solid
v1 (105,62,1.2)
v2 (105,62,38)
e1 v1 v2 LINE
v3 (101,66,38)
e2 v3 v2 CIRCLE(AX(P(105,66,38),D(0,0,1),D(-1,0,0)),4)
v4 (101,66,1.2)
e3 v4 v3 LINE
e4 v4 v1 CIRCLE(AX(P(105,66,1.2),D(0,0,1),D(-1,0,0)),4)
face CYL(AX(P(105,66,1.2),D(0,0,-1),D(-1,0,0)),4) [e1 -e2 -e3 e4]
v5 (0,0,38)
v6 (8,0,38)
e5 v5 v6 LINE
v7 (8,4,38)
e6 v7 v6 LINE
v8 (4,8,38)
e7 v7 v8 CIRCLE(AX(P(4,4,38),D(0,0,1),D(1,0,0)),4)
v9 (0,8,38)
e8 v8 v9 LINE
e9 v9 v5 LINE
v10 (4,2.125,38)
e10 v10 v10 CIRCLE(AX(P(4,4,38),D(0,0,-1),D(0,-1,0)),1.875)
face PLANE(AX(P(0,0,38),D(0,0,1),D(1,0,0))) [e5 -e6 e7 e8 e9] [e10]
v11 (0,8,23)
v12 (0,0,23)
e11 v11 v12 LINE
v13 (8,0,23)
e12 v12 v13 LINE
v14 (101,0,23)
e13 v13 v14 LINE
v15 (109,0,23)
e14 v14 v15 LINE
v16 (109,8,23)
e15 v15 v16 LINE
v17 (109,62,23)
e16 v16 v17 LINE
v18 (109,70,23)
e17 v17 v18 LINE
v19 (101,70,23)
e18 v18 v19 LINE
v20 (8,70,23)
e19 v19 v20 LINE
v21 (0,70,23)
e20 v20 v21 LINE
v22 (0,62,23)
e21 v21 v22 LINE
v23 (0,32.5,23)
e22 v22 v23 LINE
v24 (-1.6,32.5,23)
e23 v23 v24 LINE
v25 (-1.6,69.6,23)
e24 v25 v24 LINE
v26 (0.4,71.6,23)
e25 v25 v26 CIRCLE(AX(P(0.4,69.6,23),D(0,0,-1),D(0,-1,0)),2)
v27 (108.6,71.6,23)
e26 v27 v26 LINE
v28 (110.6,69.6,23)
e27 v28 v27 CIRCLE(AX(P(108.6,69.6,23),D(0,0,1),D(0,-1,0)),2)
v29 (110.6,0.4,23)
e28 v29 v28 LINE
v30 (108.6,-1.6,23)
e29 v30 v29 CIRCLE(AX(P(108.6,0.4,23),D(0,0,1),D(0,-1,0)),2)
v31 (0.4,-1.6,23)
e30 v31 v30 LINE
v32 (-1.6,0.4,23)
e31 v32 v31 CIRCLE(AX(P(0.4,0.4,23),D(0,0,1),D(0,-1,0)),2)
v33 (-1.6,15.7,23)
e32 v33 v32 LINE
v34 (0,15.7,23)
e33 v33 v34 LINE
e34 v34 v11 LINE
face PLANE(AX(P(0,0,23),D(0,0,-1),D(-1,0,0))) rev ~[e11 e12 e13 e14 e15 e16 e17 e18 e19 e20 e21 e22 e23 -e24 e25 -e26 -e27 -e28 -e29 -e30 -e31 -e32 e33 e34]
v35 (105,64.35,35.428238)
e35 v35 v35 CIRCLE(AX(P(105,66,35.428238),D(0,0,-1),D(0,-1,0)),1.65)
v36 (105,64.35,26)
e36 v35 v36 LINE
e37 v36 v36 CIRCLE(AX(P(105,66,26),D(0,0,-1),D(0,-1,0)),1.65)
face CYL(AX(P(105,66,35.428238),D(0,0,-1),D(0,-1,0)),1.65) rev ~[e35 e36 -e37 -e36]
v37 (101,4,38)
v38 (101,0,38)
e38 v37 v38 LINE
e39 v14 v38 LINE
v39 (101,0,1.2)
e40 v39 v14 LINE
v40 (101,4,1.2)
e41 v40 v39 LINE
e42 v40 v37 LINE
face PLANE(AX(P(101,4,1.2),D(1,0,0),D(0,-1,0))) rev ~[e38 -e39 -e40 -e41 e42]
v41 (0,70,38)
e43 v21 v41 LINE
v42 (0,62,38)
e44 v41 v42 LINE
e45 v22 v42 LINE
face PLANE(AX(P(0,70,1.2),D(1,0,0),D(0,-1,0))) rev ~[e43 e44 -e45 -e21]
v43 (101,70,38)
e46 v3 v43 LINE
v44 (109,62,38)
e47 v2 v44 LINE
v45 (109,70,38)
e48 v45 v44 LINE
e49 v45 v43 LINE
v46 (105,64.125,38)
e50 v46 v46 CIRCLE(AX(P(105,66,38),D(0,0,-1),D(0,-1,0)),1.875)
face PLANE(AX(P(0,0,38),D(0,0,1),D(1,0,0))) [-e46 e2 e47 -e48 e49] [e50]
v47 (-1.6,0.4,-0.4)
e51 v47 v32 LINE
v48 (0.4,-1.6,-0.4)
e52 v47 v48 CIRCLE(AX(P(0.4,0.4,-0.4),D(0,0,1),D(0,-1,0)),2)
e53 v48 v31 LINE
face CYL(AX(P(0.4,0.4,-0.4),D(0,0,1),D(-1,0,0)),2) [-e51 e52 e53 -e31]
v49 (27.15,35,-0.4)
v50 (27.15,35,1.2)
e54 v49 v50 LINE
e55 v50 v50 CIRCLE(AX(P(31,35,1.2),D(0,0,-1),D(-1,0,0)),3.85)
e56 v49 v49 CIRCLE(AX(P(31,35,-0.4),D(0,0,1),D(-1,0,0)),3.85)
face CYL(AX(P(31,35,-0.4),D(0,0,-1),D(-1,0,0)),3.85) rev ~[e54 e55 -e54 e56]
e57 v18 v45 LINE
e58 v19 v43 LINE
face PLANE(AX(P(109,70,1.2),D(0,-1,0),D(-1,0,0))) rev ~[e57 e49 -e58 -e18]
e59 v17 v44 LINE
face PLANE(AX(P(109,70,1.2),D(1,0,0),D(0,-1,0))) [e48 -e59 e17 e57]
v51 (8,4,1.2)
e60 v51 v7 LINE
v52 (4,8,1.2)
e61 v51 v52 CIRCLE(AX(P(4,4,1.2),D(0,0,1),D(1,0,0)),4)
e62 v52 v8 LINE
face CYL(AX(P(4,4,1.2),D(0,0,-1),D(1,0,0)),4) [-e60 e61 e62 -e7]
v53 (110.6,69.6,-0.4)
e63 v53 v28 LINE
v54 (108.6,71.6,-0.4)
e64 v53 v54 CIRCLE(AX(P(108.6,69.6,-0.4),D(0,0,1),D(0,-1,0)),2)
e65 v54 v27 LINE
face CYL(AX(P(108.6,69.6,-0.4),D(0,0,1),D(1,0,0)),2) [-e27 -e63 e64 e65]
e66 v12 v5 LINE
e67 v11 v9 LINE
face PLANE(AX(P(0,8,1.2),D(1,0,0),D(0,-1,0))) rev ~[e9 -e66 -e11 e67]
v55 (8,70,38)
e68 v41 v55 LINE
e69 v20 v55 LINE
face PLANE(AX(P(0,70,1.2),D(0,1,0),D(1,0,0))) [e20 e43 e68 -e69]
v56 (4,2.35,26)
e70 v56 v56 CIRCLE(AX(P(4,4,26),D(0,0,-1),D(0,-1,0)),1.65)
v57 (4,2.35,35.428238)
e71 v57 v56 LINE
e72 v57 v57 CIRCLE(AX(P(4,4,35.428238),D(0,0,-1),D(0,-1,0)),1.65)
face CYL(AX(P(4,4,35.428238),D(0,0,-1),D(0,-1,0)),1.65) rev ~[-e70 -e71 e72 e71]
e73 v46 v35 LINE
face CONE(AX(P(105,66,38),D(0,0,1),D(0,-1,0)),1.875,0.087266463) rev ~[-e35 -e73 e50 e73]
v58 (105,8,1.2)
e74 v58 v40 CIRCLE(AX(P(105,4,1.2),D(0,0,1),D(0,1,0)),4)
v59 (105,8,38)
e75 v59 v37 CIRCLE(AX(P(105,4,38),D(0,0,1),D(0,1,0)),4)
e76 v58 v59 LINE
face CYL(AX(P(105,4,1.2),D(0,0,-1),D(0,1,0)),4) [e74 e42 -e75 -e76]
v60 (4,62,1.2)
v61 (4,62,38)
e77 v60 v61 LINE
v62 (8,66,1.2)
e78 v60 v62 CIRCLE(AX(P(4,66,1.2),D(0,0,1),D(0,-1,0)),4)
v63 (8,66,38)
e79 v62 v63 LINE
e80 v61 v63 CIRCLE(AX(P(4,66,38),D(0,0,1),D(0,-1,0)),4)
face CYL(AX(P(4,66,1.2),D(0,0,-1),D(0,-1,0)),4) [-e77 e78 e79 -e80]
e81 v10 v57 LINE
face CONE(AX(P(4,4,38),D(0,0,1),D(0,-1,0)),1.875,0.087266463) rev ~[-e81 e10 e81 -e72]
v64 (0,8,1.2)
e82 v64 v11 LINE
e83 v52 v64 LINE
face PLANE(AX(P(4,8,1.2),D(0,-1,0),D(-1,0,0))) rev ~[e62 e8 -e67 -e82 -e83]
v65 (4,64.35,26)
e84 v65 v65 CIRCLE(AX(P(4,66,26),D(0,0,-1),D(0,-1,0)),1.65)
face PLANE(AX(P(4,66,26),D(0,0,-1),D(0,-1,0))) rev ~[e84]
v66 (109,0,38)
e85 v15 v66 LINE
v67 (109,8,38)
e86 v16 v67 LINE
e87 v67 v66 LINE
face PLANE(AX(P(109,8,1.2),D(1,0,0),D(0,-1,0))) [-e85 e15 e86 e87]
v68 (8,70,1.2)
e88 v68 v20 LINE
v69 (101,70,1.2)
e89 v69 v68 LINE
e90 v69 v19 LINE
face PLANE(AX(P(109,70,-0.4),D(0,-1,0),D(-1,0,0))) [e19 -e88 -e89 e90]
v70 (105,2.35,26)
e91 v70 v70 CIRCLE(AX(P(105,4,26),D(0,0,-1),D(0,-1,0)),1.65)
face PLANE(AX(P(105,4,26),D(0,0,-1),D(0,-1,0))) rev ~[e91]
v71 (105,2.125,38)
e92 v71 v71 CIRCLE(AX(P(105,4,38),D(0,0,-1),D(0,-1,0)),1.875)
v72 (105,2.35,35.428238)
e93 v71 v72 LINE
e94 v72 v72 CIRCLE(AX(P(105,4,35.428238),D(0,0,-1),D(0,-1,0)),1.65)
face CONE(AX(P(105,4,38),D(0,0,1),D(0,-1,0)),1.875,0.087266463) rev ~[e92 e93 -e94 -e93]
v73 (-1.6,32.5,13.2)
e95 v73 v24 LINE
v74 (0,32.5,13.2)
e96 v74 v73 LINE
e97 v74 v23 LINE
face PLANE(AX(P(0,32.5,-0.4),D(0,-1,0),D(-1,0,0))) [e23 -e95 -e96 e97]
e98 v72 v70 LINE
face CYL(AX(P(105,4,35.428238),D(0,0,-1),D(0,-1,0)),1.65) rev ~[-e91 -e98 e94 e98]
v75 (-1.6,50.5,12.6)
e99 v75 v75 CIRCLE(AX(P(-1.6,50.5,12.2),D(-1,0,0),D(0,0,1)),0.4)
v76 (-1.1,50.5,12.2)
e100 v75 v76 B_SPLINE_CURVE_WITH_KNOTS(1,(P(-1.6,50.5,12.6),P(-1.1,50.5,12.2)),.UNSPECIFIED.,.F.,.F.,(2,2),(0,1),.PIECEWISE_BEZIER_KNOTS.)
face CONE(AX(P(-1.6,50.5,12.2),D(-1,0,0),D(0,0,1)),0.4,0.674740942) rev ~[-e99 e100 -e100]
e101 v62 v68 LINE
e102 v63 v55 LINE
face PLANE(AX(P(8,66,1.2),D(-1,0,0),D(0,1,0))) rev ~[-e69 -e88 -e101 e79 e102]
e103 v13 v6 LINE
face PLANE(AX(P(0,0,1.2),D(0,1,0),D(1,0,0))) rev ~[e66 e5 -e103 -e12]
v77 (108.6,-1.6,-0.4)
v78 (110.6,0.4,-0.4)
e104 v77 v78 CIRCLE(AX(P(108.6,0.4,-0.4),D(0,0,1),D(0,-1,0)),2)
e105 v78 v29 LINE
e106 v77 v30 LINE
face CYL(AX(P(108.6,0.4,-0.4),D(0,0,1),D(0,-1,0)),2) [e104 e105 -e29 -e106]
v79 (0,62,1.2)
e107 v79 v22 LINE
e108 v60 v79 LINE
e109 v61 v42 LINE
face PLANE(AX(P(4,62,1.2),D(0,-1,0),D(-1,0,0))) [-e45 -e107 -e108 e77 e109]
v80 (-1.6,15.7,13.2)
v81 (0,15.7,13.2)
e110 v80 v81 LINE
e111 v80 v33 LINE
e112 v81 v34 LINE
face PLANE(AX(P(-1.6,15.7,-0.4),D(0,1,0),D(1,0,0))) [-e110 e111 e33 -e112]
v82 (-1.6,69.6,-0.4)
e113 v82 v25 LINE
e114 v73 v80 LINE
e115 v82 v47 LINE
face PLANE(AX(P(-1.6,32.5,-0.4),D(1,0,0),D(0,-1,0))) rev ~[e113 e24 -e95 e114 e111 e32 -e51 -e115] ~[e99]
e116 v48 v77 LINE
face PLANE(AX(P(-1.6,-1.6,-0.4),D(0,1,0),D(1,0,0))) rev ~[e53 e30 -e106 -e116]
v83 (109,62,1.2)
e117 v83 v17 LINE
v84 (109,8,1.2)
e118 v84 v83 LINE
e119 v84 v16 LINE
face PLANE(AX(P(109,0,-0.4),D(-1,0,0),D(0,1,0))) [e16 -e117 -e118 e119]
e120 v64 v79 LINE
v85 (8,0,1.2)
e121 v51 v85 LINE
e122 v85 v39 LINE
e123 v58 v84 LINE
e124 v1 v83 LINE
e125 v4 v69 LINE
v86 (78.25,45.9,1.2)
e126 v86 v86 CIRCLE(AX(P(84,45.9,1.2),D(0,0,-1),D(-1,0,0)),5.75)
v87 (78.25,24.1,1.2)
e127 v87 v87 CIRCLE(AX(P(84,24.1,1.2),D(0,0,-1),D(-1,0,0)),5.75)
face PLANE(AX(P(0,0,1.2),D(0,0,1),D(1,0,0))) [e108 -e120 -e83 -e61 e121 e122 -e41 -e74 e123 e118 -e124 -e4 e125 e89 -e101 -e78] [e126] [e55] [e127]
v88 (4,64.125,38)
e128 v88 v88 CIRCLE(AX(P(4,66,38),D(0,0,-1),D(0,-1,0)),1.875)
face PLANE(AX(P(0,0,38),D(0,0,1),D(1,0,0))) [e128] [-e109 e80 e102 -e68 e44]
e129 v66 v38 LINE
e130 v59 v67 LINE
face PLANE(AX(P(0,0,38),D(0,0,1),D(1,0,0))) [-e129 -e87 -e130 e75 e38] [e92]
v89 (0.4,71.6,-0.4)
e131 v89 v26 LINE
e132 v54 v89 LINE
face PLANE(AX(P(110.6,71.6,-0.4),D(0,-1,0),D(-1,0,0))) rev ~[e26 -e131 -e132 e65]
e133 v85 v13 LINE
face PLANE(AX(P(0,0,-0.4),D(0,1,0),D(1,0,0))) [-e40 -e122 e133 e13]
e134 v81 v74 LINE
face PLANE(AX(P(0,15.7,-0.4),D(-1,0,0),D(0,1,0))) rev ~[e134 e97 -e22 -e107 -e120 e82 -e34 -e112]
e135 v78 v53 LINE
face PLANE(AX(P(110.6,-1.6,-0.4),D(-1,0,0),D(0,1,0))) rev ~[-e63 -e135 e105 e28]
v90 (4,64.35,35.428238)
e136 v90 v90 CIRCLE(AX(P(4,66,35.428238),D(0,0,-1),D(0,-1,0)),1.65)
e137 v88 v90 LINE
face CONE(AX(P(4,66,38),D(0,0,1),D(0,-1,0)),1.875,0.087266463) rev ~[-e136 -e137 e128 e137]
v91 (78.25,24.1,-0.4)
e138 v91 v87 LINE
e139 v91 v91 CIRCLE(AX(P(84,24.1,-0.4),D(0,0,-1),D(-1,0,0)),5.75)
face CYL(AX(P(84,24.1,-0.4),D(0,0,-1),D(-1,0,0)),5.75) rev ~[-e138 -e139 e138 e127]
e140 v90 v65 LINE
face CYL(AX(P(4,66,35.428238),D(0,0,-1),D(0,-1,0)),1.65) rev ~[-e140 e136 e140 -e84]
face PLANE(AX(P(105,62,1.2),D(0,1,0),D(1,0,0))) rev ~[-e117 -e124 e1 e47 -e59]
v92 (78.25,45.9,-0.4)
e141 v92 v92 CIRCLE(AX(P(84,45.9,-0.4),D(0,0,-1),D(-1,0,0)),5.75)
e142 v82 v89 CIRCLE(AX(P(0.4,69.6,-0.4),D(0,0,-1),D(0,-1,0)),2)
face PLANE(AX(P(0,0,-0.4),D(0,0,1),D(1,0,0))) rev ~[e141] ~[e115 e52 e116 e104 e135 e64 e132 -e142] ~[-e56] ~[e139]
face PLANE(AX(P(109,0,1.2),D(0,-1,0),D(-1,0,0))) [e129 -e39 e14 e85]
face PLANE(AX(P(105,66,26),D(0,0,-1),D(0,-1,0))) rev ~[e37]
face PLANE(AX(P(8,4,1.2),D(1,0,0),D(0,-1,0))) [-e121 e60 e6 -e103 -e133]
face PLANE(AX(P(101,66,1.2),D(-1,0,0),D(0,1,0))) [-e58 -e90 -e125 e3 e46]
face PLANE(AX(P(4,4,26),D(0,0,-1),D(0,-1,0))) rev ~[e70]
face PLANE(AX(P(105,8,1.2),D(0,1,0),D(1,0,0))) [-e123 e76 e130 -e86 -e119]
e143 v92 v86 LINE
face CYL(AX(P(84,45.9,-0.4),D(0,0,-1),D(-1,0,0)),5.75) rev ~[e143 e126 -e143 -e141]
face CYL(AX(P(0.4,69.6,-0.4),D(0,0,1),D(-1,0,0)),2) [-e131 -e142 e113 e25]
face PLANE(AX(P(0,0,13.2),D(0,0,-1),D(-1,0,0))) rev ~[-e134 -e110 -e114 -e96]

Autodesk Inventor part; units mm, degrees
ref_plane "YZ Plane" through (0, 0, 0) normal (1, 0, 0) x (0, 1, 0)
ref_plane "XZ Plane" through (0, 0, 0) normal (0, 1, 0) x (-1, 0, 0)
sketch "zakladna" plane through (0, 0, 0) normal (0, 0, 1) x (1, 0, 0)
  line L0 (0, 0) -> (109, 0)
  line L1 (109, 0) -> (109, 70)
  line L2 (109, 70) -> (0, 70)
  line L3 (0, 70) -> (0, 0)
  dimension "d0" = 109
  dimension "d1" = 70
extrude "Extrusion1" add sketch "zakladna" along normal blind 1.2 and the other way blind 0.4
sketch "stena_RJ45" plane through (0, 0, -0.4) normal (0, 0, -1) x (-1, 0, 0)
  line L0 (1.6, 15.7) -> (0, 15.7)
  line L1 (0, 15.7) -> (0, 32.5)
  line L2 (0, 32.5) -> (1.6, 32.5)
  line L3 (1.6, 32.5) -> (1.6, 15.7)
  line L4 (-109, 0) -> (0, 0) projected
  line L5 (0, 0) -> (0, 70) projected
  dimension "d4" = 1.6
  dimension "d5" = 16.8
  dimension "d6" = 15.7
  dimension "d7" = 0
sketch "diry_tlacirka_LED" plane through (0, 0, -0.4) normal (0, 0, -1) x (-1, 0, 0)
  line L0 (-109, 70) -> (-109, 0) projected
  line L1 (-109, 0) -> (-109, 70) projected
  line L2 (-109, 35) -> (-3.6376, 35)
  line L3 (1.6, 32.5) -> (1.6, 15.7) projected
  circle A0 centre (-84, 24.1) radius 5.75
  circle A1 centre (-84, 45.9) radius 5.75
  circle A2 centre (-31, 35) radius 3.85
  line L4 (0, 0) -> (0, 70) projected
  dimension "d9" = 11.5
  dimension "d10" = 7.7
  dimension "d11" = 31
  dimension "d53" = 25
extrude "Extrusion2" cut sketch "diry_tlacirka_LED" against normal blind 2
sketch "steny" plane through (0, 0, -0.4) normal (0, 0, -1) x (-1, 0, 0)
  line L0 (-109, 70) -> (0, 70) projected
  line L1 (0, 0) -> (-109, 0) projected
  line L2 (0, 15.7) -> (0, 0)
  line L3 (-109, 0) -> (-109, 70) projected
  line L4 (0, 0) -> (-109, 0)
  line L5 (-109, 0) -> (-109, 70)
  line L6 (-109, 70) -> (0, 70)
  line L7 (0, 70) -> (0, 32.5)
  line L8 (1.6, 15.7) -> (1.6, -1.6)
  line L9 (1.6, -1.6) -> (-110.6, -1.6)
  line L10 (-110.6, -1.6) -> (-110.6, 71.6)
  line L11 (-110.6, 71.6) -> (1.6, 71.6)
  line L12 (1.6, 71.6) -> (1.6, 32.5)
  line L13 (1.6, 15.7) -> (0, 15.7) projected
  line L14 (0, 32.5) -> (1.6, 32.5) projected
  dimension "d42" = 1.6
extrude "Extrusion3" add sketch "steny" against normal blind 23.4
extrude "Extrusion4" add sketch "stena_RJ45" against normal blind 13.6
sketch "Sketch5" plane through (0, 0, 1.2) normal (0, 0, 1) x (1, 0, 0)
  arc A0 (4, 62) -> (8, 66) centre (4, 66) ccw
  line L0 (4, 62) -> (0, 62)
  line L1 (8, 66) -> (8, 70)
  line L2 (0, 70) -> (0, 0)
  line L3 (0, 62) -> (0, 70)
  line L4 (0, 70) -> (8, 70)
  arc A1 (8, 4) -> (4, 8) centre (4, 4) ccw
  line L5 (4, 8) -> (0, 8)
  line L6 (8, 4) -> (8, 0)
  line L7 (0, 8) -> (0, 0)
  line L8 (0, 0) -> (8, 0)
  line L9 (109, 0) -> (0, 0) projected
  line L10 (0, 0) -> (8, 0)
  line L11 (109, 70) -> (109, 0) projected
  line L12 (105, 62) -> (109, 62)
  arc A2 (101, 66) -> (105, 62) centre (105, 66) ccw
  line L13 (109, 62) -> (109, 70)
  line L14 (109, 70) -> (101, 70)
  line L15 (101, 66) -> (101, 70)
  line L16 (109, 0) -> (101, 0)
  line L17 (109, 0) -> (101, 0)
  line L18 (101, 4) -> (101, 0)
  line L19 (105, 8) -> (109, 8)
  line L20 (109, 8) -> (109, 0)
  arc A3 (105, 8) -> (101, 4) centre (105, 4) ccw
  point P0 (0, 32.5)
  dimension "d22" = 8
extrude "Extrusion5" add sketch "Sketch5" along normal blind 36.8
sketch "diry_zavitova_vlozka" plane through (0, 0, 38) normal (0, 0, 1) x (1, 0, 0)
  arc A0 (8, 4) -> (4, 8) centre (4, 4) ccw projected
  arc A1 (4, 62) -> (8, 66) centre (4, 66) ccw projected
  arc A2 (105, 8) -> (101, 4) centre (105, 4) ccw projected
  arc A3 (101, 66) -> (105, 62) centre (105, 66) ccw projected
  point P0 (0, 0)
hole "Hole1" at (105, 4, 38) at (105, 66, 38) at (4, 4, 38) at (4, 66, 38) direction (0, 0, -1) diameter 3.3 depth 12 countersink diameter 3.75 countersink angle 10
fillet "Fillet1" radius 2 4 edges at (-1.6, 71.6, 11.3) (-1.6, -1.6, 11.3) (110.6, -1.6, 11.3) (110.6, 71.6, 11.3)
sketch "znacka_napajeni1" plane through (-1.6, 15.7, 13.2) normal (-1, 0, 0) x (0, 0, 1)
  circle A0 centre (-1, 34.8) radius 0.4
  line L0 (0, 16.8) -> (0, 0) projected
  line L1 (0, 16.8) -> (9.8, 16.8) projected
  dimension "d44" = 0.8
  dimension "d45" = 1
  dimension "d46" = 18
ref_plane "rovina_napajeni_znacka2" through (-1.1, 15.7, 13.2) normal (-1, 0, 0) x (0, 0, 1)
sketch "napajeni_znacka2" plane through (-1.1, 15.7, 13.2) normal (-1, 0, 0) x (0, 0, 1)
  point P0 (-13.2, -15.7)
  point P1 (-1, 34.8)
loft "Loft1" cut profiles "znacka_napajeni1" section 2 point at (-1.1, 50.5, 12.2)
properties part number "case_top"
